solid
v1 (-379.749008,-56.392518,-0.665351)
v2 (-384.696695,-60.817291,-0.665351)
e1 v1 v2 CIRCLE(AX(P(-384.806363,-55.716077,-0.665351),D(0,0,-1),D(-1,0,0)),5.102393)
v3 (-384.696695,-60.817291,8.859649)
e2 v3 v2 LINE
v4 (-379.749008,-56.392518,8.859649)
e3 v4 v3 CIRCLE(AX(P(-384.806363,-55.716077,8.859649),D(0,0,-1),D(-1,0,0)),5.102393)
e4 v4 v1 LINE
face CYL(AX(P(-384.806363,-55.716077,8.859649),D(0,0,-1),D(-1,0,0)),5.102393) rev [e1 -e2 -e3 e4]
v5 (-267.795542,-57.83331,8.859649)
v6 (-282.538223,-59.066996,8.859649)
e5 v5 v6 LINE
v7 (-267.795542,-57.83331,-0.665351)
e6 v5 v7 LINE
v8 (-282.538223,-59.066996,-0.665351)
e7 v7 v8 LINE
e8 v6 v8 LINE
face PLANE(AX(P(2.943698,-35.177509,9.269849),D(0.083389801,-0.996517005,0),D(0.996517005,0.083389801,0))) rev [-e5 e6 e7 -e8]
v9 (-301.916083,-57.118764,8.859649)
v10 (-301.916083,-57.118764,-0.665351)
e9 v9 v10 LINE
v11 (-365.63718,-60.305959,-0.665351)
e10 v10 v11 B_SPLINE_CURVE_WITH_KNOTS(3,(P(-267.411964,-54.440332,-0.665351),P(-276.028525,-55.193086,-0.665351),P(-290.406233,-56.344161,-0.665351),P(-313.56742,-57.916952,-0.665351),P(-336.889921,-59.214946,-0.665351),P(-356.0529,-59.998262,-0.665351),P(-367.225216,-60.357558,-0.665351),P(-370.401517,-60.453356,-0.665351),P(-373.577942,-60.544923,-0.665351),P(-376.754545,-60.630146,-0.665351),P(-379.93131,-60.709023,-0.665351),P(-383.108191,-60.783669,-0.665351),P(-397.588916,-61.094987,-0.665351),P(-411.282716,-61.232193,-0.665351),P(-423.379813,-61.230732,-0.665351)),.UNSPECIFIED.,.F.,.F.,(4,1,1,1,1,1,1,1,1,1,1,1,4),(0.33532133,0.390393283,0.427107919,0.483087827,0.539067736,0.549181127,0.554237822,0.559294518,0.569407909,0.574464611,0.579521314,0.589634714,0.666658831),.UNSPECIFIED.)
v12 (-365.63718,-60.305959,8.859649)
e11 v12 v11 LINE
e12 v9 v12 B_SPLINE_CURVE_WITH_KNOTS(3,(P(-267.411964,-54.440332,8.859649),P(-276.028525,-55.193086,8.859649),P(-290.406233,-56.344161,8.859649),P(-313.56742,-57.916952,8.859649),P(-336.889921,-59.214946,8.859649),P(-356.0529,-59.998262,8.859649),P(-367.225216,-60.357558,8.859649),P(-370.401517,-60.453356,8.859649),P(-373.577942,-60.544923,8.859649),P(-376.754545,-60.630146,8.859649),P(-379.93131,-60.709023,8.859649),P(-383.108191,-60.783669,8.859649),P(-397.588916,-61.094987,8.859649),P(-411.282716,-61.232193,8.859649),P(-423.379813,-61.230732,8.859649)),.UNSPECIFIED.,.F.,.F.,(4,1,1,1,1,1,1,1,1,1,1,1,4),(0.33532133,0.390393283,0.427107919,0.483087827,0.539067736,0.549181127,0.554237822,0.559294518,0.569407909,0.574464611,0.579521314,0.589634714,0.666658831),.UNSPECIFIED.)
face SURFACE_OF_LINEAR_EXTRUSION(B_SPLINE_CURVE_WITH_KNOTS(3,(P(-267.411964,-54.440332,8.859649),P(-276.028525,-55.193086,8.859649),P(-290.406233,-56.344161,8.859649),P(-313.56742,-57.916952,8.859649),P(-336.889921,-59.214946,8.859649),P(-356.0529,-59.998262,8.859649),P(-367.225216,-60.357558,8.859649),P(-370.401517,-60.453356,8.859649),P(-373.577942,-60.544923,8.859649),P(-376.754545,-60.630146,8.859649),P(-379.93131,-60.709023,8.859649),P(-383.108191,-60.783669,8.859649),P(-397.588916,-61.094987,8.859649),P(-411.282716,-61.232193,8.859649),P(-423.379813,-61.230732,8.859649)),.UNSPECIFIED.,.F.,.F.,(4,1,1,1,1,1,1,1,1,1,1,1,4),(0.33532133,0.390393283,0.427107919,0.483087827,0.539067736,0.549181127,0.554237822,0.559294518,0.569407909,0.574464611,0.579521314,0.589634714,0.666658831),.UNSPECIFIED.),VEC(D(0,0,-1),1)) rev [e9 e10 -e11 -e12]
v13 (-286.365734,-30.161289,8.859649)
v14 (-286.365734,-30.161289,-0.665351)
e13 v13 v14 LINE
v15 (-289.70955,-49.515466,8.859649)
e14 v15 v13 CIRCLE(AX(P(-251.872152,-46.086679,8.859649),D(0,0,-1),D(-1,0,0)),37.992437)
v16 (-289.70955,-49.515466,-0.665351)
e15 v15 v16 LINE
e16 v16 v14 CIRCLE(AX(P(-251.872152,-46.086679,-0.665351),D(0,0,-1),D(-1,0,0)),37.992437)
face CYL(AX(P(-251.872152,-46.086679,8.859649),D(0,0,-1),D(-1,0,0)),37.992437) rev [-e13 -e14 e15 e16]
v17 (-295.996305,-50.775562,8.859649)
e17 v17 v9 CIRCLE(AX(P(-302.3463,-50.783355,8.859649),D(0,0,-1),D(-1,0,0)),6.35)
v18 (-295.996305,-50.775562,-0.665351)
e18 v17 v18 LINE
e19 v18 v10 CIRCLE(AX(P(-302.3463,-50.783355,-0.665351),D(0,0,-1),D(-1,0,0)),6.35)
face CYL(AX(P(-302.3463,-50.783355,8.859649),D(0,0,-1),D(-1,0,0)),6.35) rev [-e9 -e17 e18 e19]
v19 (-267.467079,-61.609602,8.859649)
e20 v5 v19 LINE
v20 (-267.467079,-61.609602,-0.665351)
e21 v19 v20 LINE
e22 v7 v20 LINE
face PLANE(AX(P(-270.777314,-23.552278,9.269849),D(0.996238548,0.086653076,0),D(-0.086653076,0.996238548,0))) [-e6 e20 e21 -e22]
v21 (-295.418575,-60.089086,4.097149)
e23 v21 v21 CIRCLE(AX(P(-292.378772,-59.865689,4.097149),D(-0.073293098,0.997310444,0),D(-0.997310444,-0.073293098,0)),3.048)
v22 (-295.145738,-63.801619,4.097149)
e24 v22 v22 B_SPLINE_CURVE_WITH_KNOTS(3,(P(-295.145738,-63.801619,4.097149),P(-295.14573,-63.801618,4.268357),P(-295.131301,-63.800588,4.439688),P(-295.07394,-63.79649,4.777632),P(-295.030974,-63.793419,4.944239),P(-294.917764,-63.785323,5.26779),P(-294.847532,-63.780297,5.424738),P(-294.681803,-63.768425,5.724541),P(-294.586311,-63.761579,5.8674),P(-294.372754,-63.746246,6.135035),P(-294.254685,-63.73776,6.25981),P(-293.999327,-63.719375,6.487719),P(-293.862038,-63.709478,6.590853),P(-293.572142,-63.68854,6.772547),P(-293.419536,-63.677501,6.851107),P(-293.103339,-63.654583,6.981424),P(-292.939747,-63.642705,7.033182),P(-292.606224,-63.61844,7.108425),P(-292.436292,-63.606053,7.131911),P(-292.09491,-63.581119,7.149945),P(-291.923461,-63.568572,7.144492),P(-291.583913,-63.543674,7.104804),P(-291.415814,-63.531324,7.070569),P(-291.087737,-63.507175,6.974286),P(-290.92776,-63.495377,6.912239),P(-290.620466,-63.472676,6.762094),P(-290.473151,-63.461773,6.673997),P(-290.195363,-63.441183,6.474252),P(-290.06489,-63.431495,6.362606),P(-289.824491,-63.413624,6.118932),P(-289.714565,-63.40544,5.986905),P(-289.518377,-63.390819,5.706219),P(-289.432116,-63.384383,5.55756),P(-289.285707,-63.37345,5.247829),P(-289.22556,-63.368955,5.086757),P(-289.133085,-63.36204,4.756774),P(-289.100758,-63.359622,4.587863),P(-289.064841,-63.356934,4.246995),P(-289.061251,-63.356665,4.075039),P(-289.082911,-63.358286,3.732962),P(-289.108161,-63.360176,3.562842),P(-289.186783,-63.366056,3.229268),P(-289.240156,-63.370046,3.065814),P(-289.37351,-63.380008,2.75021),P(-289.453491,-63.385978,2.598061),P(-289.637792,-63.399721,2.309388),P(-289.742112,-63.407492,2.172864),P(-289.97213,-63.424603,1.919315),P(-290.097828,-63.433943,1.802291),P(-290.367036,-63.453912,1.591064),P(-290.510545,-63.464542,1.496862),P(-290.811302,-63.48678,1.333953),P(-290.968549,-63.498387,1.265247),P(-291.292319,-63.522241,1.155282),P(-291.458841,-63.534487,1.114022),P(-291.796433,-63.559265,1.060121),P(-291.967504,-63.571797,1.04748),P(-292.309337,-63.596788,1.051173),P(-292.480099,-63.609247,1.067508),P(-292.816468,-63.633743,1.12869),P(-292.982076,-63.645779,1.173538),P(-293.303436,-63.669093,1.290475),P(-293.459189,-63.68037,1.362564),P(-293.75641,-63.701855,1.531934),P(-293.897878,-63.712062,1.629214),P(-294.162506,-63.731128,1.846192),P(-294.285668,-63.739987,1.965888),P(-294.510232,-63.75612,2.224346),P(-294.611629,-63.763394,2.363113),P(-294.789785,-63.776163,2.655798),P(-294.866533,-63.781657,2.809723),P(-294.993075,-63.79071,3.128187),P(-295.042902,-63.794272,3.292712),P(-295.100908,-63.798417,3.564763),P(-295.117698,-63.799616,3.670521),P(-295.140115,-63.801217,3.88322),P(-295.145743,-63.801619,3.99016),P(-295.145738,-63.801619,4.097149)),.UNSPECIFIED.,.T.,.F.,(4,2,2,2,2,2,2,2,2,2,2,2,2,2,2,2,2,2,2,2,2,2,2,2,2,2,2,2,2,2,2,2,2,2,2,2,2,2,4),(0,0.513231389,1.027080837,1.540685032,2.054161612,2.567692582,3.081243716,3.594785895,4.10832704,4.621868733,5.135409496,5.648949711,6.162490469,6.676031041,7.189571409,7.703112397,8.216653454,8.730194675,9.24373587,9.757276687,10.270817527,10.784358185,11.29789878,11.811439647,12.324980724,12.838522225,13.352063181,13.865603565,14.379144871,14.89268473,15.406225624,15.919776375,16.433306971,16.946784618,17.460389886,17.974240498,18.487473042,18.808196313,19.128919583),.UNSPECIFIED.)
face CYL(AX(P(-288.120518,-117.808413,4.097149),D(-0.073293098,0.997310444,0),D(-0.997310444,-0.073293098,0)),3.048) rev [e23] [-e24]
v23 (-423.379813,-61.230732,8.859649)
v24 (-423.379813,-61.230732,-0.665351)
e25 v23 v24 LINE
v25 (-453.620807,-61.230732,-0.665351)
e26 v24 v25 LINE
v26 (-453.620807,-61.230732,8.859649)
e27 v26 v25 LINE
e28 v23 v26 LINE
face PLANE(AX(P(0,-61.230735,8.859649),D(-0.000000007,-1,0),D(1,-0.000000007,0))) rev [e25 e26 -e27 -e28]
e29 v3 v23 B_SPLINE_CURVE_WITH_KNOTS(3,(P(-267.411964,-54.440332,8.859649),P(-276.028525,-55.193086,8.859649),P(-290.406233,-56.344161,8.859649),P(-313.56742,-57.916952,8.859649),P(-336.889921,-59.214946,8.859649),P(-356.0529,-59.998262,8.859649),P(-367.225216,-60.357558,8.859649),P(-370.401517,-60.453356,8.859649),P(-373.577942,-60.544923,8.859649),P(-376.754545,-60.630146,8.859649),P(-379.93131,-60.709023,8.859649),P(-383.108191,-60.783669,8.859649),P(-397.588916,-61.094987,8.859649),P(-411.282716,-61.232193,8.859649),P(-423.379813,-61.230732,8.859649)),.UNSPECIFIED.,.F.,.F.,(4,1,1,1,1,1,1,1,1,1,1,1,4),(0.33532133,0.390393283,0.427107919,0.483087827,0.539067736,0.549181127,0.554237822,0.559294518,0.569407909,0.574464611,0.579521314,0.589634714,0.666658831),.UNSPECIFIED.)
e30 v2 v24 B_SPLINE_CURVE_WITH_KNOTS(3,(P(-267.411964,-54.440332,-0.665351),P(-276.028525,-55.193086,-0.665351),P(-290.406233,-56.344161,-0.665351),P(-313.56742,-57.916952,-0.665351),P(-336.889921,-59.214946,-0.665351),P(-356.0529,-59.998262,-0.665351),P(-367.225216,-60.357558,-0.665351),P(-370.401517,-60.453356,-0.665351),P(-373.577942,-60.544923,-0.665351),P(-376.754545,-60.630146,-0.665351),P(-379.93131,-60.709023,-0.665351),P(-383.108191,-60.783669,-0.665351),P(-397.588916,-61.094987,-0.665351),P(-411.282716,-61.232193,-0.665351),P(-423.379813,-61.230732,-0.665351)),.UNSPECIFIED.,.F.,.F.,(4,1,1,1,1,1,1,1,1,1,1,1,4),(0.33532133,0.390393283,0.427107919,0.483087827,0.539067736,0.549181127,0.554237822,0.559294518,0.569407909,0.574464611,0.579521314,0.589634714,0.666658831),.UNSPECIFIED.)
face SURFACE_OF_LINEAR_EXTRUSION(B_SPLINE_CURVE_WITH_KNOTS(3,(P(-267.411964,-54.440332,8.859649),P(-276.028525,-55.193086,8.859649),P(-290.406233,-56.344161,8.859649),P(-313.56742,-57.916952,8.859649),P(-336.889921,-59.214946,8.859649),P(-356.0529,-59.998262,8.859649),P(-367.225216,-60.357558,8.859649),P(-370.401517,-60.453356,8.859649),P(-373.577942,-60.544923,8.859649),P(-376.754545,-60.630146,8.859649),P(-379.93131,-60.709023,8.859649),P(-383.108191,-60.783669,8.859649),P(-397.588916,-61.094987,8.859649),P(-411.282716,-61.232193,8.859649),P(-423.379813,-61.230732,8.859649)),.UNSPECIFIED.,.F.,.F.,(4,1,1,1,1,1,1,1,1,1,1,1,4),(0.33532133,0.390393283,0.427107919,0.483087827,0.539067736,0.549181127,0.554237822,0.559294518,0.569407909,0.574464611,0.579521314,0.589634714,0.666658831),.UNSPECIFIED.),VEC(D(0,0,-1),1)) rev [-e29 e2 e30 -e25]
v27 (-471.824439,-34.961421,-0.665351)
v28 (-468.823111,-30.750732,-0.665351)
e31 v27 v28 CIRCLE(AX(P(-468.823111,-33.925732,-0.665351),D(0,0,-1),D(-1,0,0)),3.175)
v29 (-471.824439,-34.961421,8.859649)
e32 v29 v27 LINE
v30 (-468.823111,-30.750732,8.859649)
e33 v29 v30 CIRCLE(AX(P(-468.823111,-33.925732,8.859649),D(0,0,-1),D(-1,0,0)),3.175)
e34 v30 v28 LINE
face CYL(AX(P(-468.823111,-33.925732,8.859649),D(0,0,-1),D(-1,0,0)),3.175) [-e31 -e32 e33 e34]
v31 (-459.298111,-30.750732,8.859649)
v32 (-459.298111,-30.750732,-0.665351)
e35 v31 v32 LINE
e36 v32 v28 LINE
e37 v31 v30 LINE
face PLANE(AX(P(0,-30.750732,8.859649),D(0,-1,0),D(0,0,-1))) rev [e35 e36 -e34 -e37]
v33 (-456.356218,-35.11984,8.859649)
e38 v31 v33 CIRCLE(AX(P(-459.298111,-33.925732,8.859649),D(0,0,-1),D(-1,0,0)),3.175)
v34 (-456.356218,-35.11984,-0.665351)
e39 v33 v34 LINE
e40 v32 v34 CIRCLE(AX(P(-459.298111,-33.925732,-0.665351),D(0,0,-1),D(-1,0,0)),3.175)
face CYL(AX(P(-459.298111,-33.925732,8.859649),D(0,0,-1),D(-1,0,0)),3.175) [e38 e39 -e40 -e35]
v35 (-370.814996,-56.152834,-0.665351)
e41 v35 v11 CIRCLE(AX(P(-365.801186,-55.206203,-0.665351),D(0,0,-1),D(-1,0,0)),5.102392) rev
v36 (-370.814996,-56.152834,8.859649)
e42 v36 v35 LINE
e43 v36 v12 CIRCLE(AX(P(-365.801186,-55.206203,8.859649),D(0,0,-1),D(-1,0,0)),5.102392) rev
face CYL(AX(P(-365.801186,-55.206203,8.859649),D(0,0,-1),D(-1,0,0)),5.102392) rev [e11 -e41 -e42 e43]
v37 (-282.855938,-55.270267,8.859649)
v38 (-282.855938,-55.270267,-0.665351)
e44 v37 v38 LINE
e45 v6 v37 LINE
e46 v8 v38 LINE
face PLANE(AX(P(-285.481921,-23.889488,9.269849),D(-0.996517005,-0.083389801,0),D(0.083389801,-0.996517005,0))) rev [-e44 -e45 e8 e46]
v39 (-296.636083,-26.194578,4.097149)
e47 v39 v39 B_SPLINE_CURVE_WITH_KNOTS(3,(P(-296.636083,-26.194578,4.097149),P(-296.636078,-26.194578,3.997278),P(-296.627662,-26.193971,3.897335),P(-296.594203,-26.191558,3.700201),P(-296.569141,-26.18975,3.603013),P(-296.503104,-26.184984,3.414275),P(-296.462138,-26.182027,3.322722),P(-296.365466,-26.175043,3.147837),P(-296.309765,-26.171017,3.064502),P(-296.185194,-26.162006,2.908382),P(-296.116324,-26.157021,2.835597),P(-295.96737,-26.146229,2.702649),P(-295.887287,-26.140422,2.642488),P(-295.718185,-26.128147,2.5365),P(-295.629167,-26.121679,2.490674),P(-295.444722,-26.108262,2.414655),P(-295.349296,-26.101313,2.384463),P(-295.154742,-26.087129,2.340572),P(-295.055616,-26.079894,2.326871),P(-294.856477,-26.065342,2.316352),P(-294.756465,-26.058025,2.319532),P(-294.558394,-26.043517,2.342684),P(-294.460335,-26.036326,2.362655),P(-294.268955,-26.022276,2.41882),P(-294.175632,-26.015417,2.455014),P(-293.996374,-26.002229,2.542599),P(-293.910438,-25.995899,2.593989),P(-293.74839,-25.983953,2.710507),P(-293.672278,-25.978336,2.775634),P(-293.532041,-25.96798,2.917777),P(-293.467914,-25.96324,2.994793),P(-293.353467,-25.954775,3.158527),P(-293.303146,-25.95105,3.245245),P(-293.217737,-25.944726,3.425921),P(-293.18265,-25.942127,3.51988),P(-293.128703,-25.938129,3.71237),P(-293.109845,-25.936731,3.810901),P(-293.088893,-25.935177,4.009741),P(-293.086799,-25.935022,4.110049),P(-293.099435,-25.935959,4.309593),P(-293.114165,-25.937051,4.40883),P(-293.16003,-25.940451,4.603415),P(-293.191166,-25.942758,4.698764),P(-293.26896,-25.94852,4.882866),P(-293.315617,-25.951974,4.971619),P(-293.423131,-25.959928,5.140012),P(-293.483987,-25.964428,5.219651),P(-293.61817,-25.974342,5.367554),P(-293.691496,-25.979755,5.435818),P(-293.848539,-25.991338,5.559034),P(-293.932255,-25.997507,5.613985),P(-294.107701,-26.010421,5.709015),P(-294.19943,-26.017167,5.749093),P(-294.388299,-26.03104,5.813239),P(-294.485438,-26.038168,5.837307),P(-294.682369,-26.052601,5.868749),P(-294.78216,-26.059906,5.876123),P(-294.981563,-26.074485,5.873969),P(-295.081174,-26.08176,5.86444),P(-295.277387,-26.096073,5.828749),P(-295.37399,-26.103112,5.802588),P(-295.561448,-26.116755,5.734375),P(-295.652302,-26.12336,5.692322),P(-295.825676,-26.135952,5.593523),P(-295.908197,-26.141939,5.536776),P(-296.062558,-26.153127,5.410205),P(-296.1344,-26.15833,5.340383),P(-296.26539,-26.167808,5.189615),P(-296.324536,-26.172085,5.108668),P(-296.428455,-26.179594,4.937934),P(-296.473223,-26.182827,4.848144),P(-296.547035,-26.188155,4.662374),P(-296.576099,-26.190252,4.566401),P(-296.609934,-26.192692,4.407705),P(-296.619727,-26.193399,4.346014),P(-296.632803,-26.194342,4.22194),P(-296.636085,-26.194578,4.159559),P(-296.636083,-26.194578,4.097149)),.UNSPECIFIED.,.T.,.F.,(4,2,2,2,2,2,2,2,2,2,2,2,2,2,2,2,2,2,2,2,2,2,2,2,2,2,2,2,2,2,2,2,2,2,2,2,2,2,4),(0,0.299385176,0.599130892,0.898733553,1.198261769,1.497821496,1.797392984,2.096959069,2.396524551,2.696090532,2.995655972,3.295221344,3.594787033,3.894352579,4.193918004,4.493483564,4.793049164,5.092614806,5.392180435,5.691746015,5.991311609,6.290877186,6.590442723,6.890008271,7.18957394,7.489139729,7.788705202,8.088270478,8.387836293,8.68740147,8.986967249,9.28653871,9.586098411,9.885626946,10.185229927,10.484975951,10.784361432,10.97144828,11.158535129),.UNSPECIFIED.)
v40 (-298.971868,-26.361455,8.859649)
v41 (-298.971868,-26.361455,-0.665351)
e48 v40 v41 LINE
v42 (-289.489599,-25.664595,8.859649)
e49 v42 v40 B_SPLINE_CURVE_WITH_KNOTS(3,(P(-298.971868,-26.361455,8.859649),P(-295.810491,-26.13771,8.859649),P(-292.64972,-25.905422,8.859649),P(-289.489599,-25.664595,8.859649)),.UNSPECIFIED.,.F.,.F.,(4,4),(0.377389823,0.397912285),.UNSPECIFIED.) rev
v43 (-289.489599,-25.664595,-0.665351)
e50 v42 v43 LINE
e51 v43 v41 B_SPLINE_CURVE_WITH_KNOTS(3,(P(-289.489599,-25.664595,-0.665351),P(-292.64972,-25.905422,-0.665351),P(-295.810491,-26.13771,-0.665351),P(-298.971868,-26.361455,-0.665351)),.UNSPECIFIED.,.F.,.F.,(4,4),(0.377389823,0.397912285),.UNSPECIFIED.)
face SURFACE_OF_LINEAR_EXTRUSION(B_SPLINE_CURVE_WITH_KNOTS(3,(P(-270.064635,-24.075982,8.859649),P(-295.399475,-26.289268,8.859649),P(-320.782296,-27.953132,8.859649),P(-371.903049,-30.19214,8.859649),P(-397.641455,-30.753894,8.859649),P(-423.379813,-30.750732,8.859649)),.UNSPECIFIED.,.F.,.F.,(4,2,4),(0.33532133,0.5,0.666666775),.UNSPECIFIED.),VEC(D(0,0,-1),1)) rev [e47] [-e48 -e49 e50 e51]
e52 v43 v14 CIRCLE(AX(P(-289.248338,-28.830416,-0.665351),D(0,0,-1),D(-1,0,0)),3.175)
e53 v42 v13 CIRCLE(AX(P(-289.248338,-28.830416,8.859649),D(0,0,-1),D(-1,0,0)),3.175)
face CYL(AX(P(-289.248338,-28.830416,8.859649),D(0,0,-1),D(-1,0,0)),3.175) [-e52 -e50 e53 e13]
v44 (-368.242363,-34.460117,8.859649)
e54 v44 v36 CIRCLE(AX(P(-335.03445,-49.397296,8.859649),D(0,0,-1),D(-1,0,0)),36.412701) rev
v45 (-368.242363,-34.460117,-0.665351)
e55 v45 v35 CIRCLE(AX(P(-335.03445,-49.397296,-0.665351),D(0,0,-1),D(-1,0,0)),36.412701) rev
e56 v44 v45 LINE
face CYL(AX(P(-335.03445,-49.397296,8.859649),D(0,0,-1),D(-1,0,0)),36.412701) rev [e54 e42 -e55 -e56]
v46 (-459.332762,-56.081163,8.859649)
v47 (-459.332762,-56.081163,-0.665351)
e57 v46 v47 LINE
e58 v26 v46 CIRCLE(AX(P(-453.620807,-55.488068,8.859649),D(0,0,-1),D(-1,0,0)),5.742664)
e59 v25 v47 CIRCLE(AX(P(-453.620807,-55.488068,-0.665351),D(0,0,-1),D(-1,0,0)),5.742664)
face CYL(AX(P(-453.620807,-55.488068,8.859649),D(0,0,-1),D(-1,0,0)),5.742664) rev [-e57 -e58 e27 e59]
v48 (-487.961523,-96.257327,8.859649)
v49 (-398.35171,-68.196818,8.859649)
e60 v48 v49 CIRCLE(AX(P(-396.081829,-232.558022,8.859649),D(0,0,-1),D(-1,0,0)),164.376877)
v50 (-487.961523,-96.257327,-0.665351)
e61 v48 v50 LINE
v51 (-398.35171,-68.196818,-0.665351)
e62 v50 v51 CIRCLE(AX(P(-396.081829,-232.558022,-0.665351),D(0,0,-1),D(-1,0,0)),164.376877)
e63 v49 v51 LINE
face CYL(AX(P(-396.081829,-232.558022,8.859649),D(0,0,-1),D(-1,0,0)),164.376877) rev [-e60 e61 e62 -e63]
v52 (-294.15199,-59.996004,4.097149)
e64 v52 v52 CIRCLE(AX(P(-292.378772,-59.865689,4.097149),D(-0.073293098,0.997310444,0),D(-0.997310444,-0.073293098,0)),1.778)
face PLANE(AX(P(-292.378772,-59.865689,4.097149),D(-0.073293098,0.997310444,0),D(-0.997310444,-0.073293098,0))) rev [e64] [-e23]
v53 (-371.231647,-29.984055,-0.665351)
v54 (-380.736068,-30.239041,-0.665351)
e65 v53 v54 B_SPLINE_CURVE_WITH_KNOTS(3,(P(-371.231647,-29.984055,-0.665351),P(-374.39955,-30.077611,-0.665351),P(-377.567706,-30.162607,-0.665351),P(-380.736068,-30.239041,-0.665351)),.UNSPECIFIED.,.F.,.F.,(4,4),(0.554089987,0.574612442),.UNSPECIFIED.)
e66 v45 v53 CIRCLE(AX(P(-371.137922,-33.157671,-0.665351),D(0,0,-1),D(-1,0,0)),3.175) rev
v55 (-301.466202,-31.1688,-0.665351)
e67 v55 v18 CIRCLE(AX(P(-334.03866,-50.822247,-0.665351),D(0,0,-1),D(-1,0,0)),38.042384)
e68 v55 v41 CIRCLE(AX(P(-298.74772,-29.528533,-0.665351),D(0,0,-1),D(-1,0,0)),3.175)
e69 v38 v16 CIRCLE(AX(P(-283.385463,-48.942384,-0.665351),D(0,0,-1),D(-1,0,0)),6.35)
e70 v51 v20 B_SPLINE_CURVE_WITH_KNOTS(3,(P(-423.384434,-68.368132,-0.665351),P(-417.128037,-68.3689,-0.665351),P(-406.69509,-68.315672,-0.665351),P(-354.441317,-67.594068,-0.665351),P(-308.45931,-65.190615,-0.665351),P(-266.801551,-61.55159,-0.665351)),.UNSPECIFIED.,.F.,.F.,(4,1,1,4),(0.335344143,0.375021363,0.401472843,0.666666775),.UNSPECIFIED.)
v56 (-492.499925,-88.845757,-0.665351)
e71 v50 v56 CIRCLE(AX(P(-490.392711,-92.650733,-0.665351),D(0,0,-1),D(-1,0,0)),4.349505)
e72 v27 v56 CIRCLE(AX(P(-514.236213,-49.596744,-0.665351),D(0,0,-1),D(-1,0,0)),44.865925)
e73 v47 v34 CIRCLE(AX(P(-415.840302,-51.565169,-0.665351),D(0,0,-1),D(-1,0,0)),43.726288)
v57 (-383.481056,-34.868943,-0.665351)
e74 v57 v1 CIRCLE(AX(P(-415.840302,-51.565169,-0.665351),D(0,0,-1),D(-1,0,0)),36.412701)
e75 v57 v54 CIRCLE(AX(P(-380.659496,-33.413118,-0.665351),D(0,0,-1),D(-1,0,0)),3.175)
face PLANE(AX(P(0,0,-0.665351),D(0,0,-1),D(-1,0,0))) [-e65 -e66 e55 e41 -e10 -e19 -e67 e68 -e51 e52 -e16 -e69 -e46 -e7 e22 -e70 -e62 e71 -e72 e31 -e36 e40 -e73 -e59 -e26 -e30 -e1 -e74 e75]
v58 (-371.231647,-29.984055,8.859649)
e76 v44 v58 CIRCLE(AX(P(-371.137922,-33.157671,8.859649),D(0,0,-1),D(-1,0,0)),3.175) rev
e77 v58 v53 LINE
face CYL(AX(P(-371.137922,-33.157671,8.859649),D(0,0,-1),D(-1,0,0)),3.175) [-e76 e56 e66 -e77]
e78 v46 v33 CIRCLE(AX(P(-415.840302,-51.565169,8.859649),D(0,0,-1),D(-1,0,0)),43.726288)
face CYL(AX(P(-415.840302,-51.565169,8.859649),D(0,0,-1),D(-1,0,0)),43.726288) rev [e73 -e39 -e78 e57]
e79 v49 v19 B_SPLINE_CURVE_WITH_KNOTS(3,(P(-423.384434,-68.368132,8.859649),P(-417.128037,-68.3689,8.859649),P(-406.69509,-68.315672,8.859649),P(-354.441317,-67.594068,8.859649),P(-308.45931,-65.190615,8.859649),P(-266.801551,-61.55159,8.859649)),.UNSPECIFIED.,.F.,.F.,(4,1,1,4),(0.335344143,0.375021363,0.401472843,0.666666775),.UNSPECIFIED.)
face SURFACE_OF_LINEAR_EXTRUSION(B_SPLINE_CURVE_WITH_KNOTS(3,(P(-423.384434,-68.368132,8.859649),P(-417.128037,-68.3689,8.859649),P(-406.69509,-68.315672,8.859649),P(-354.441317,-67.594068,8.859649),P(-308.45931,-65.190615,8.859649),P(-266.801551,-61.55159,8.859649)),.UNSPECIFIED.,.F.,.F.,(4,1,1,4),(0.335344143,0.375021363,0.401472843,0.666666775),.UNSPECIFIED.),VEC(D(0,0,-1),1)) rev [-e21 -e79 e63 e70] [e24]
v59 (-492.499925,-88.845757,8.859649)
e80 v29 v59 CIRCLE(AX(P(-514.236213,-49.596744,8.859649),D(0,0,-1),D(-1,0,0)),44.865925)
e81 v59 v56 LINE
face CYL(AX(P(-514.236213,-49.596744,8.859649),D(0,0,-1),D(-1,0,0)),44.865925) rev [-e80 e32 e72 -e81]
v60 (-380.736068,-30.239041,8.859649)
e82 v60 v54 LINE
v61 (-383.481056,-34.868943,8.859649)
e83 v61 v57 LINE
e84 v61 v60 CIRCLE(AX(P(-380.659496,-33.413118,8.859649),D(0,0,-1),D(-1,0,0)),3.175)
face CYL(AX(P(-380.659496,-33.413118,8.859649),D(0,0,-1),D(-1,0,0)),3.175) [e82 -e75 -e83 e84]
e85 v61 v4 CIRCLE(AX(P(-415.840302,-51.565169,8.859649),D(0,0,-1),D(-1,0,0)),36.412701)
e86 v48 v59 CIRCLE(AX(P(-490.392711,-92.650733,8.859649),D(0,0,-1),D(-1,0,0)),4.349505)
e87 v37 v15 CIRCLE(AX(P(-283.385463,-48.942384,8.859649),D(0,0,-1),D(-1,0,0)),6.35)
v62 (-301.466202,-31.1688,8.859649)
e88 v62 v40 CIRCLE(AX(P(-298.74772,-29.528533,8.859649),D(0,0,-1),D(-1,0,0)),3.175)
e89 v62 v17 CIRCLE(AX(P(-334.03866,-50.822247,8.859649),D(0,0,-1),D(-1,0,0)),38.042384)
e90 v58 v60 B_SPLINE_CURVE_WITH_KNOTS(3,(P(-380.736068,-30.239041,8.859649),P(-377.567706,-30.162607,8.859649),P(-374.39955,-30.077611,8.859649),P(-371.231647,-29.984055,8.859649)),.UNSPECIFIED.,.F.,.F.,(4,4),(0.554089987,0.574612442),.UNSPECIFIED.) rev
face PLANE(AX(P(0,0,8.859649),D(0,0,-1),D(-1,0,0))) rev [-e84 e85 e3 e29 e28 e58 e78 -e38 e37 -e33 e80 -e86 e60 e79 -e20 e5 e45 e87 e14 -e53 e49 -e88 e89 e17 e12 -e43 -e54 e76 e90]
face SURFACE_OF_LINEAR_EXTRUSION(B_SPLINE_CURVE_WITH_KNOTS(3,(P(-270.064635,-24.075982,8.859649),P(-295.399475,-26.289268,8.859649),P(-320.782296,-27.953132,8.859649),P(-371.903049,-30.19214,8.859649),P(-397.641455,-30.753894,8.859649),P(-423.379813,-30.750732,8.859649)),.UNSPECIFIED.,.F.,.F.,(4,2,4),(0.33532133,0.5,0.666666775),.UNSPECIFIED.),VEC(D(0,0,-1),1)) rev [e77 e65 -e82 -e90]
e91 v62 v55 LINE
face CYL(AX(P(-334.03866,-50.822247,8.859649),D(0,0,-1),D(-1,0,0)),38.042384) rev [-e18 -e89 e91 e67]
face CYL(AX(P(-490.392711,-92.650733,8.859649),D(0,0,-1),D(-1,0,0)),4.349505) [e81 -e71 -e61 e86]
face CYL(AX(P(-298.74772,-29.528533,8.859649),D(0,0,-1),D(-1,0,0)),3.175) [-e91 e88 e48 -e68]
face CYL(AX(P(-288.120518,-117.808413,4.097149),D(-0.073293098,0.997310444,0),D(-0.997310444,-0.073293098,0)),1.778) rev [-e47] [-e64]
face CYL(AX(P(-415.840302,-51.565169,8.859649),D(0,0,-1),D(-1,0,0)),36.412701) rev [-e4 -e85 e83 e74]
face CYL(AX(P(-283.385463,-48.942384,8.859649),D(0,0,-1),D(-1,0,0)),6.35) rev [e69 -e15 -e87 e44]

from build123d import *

# Parameters (mm, degrees)
BOSS_EXTRUDE5_DEPTH = 4.7625
SKETCH6_R           = 1.778
CUT_EXTRUDE3_DEPTH  = 504.733086563
CUT_EXTRUDE4_START  = 3.556
SKETCH7_R           = 3.048
SKETCH7_R_2         = 1.778
CUT_EXTRUDE4_DEPTH  = 505.502600354
CUT_EXTRUDE5_DEPTH  = 506.075936751


with BuildPart() as part:
    # Sketch1 → Boss-Extrude5 (new, symmetric)
    with BuildSketch(Plane(origin=(0, 0, 4.097149242), x_dir=(-1, 0, 0), z_dir=(0, 0, -1))):
        with BuildLine():
            Line((4.980483945, -43.087244707), (5.013364858, -50.687454907))
            add(Edge.make_bspline(
                [(266.801551376, -61.551589611), (261.350884009, -61.078554924), (250.433518448, -60.153958667), (228.701217873, -58.434486699), (190.548987698, -55.763104255), (136.042529388, -52.86929541), (81.4824687, -51.236835025), (43.240954482, -50.737883821), (21.43842692, -50.650632415), (10.483916541, -50.667450636), (5.013364858, -50.687454907)],
                knots=[4.0417e-05, 4.0417e-05, 4.0417e-05, 4.0417e-05, 0.062531963, 0.125023508, 0.2500066, 0.499972783, 0.749938966, 0.874922057, 0.937413603, 0.999905149, 0.999905149, 0.999905149, 0.999905149], degree=3))
            add(Edge.make_bspline(
                [(398.35171036, -68.196818162), (396.265786035, -68.16801087), (352.35609282, -67.485074441), (308.459309619, -65.190615284), (266.801551376, -61.551589611)],
                knots=[0.388247103, 0.388247103, 0.388247103, 0.388247103, 0.401472843, 0.666666775, 0.666666775, 0.666666775, 0.666666775], degree=3))
            ThreePointArc((398.35171036, -68.196818162), (445.202941045, -75.692238551), (487.961522574, -96.257326662))
            ThreePointArc((487.961522574, -96.257326662), (494.102034598, -94.922101367), (492.499924864, -88.845757162))
            ThreePointArc((492.499924864, -88.845757162), (472.347982204, -65.669309605), (471.824439099, -34.961421092))
            ThreePointArc((471.824439099, -34.961421092), (471.408544547, -32.082865726), (468.823110549, -30.750731982))
            Line((468.823110549, -30.750731982), (464.060610549, -30.750731982))
            Line((464.060610549, -30.750731982), (459.298110549, -30.750731982))
            ThreePointArc((459.298110549, -30.750731982), (456.664489609, -32.15241144), (456.356218194, -35.119840174))
            ThreePointArc((456.356218194, -35.119840174), (459.13228847, -45.417631786), (459.332762362, -56.081162557))
            ThreePointArc((459.332762362, -56.081162557), (457.466080253, -59.753283819), (453.620807365, -61.230731982))
            Line((453.620807365, -61.230731985), (423.379813153, -61.230732209))
            add(Edge.make_bspline(
                [(384.69669435, -60.817291115), (385.490946639, -60.834366328), (398.38358415, -61.102948795), (411.282715888, -61.232192999), (423.379813153, -61.230732209)],
                knots=[0.584578013, 0.584578013, 0.584578013, 0.584578013, 0.589634714, 0.666658831, 0.666658831, 0.666658831, 0.666658831], degree=3))
            ThreePointArc((384.69669435, -60.817291115), (381.405012075, -59.519394431), (379.749008052, -56.392517605))
            ThreePointArc((379.749008052, -56.392517605), (379.962938882, -45.344267983), (383.481055682, -34.868942675))
            ThreePointArc((383.481055682, -34.868942675), (383.390574332, -31.793909155), (380.736068027, -30.23904122))
            add(Edge.make_bspline(
                [(380.736068027, -30.23904122), (377.567706075, -30.162607104), (374.399550345, -30.077611409), (371.231646974, -29.984054972)],
                knots=[0.564351213, 0.564351213, 0.564351213, 0.564351213, 0.584873669, 0.584873669, 0.584873669, 0.584873669], degree=3))
            ThreePointArc((371.231646974, -29.984054972), (368.497589908, -31.394357521), (368.242362423, -34.460116848))
            ThreePointArc((368.242362423, -34.460116848), (371.193755284, -45.109007001), (370.814996242, -56.152834368))
            ThreePointArc((370.814996242, -56.152834368), (368.993717842, -59.186422224), (365.637179655, -60.305958598))
            add(Edge.make_bspline(
                [(301.916083239, -57.118764264), (304.793492849, -57.314159562), (316.447125042, -58.077219349), (336.889920622, -59.214945623), (355.259103098, -59.96581465), (364.843153628, -60.280423029), (365.637179655, -60.305958598)],
                knots=[0.408750601, 0.408750601, 0.408750601, 0.408750601, 0.427107919, 0.483087827, 0.539067736, 0.544124431, 0.544124431, 0.544124431, 0.544124431], degree=3))
            ThreePointArc((301.916083239, -57.118764264), (297.703900514, -55.115863145), (295.996304567, -50.7755622))
            ThreePointArc((295.996304567, -50.7755622), (297.395526272, -40.599539879), (301.466201974, -31.168800195))
            ThreePointArc((301.466201974, -31.168800195), (301.565948035, -28.066269557), (298.971867926, -26.361454603))
            add(Edge.make_bspline(
                [(289.489598636, -25.664595471), (292.649719638, -25.90542225), (295.810491414, -26.137709697), (298.971867926, -26.361454603)],
                knots=[0.377389823, 0.377389823, 0.377389823, 0.377389823, 0.397912285, 0.397912285, 0.397912285, 0.397912285], degree=3))
            ThreePointArc((289.489598636, -25.664595471), (286.640803233, -27.018955044), (286.365734252, -30.161288915))
            ThreePointArc((286.365734252, -30.161288915), (289.309950073, -39.618561113), (289.709550194, -49.515465879))
            ThreePointArc((289.709550194, -49.515465879), (287.468803622, -53.805389908), (282.855937937, -55.270266537))
            Line((282.855937937, -55.270266537), (268.113256948, -54.036580381))
            add(Edge.make_bspline(
                [(268.113256948, -54.036580381), (262.634745624, -53.56111419), (251.663313863, -52.628696852), (229.81175043, -50.89541865), (191.471827261, -48.203857237), (136.679597141, -45.286916485), (81.835702382, -43.641470214), (43.402846546, -43.138474088), (21.480818831, -43.050269737), (10.476996172, -43.067138198), (4.980483945, -43.087244707)],
                knots=[-0.002434158, -0.002434158, -0.002434158, -0.002434158, 0.060213256, 0.12286067, 0.248155497, 0.498745152, 0.749334808, 0.874629635, 0.937277049, 0.999924463, 0.999924463, 0.999924463, 0.999924463], degree=3))
        make_face()
    boss_extrude5 = extrude(amount=BOSS_EXTRUDE5_DEPTH, both=True)

    # Sketch6 → Cut-Extrude3 (cut, through all)
    with BuildSketch(Plane(origin=(0.32087569, -4.366204823, 0), x_dir=(0.9973104440526221, 0.07329309778936742, 0), z_dir=(-0.07329309778936742, 0.9973104440526221, 0))):
        with Locations((-295.980145151, -4.097149242)):
            Circle(SKETCH6_R)
    cut_extrude3 = extrude(amount=-CUT_EXTRUDE3_DEPTH, mode=Mode.SUBTRACT)

    # Sketch7 → Cut-Extrude4 (cut)
    with BuildSketch(Plane(origin=(3.065947832, -41.718823267, 0), x_dir=(-0.9946544730103679, -0.07309790847145088, 0.07293267510222654), z_dir=(-0.07329309778936742, 0.9973104440526221, 0)).offset(CUT_EXTRUDE4_START)):
        with Locations((295.490726509, -17.500385777)):
            Circle(SKETCH7_R)
        with Locations((295.490726509, -17.500385777)):
            Circle(SKETCH7_R_2, mode=Mode.SUBTRACT)
    cut_extrude4 = extrude(amount=-CUT_EXTRUDE4_DEPTH, mode=Mode.SUBTRACT)

    # Mirror4: Boss-Extrude5, Cut-Extrude3, Cut-Extrude4 across plane
    add(boss_extrude5.mirror(Plane(origin=(-4.793985166, 0.020740296, 8.859649242), x_dir=(0, 0, 1), z_dir=(-0.9999906416249494, 0.004326275825933448, 0))))
    add(cut_extrude3.mirror(Plane(origin=(-4.793985166, 0.020740296, 8.859649242), x_dir=(0, 0, 1), z_dir=(-0.9999906416249494, 0.004326275825933448, 0))), mode=Mode.SUBTRACT)
    add(cut_extrude4.mirror(Plane(origin=(-4.793985166, 0.020740296, 8.859649242), x_dir=(0, 0, 1), z_dir=(-0.9999906416249494, 0.004326275825933448, 0))), mode=Mode.SUBTRACT)

    # Sketch9 → Cut-Extrude5 (cut, through all)
    with BuildSketch(Plane(origin=(0, 0, -0.665350758), x_dir=(-1, 0, 0), z_dir=(0, 0, -1))):
        Polygon((282.855937937, -55.270266537), (268.113256948, -54.036580381), (271.226711866, -16.830462442), (-501.730233012, -16.830462442), (-501.730233012, -147.179806135), (267.467078991, -61.609602167), (267.795541806, -57.83331017), (282.538222795, -59.066996326), align=None)
    extrude(amount=-CUT_EXTRUDE5_DEPTH, mode=Mode.SUBTRACT)


solid = part.part
